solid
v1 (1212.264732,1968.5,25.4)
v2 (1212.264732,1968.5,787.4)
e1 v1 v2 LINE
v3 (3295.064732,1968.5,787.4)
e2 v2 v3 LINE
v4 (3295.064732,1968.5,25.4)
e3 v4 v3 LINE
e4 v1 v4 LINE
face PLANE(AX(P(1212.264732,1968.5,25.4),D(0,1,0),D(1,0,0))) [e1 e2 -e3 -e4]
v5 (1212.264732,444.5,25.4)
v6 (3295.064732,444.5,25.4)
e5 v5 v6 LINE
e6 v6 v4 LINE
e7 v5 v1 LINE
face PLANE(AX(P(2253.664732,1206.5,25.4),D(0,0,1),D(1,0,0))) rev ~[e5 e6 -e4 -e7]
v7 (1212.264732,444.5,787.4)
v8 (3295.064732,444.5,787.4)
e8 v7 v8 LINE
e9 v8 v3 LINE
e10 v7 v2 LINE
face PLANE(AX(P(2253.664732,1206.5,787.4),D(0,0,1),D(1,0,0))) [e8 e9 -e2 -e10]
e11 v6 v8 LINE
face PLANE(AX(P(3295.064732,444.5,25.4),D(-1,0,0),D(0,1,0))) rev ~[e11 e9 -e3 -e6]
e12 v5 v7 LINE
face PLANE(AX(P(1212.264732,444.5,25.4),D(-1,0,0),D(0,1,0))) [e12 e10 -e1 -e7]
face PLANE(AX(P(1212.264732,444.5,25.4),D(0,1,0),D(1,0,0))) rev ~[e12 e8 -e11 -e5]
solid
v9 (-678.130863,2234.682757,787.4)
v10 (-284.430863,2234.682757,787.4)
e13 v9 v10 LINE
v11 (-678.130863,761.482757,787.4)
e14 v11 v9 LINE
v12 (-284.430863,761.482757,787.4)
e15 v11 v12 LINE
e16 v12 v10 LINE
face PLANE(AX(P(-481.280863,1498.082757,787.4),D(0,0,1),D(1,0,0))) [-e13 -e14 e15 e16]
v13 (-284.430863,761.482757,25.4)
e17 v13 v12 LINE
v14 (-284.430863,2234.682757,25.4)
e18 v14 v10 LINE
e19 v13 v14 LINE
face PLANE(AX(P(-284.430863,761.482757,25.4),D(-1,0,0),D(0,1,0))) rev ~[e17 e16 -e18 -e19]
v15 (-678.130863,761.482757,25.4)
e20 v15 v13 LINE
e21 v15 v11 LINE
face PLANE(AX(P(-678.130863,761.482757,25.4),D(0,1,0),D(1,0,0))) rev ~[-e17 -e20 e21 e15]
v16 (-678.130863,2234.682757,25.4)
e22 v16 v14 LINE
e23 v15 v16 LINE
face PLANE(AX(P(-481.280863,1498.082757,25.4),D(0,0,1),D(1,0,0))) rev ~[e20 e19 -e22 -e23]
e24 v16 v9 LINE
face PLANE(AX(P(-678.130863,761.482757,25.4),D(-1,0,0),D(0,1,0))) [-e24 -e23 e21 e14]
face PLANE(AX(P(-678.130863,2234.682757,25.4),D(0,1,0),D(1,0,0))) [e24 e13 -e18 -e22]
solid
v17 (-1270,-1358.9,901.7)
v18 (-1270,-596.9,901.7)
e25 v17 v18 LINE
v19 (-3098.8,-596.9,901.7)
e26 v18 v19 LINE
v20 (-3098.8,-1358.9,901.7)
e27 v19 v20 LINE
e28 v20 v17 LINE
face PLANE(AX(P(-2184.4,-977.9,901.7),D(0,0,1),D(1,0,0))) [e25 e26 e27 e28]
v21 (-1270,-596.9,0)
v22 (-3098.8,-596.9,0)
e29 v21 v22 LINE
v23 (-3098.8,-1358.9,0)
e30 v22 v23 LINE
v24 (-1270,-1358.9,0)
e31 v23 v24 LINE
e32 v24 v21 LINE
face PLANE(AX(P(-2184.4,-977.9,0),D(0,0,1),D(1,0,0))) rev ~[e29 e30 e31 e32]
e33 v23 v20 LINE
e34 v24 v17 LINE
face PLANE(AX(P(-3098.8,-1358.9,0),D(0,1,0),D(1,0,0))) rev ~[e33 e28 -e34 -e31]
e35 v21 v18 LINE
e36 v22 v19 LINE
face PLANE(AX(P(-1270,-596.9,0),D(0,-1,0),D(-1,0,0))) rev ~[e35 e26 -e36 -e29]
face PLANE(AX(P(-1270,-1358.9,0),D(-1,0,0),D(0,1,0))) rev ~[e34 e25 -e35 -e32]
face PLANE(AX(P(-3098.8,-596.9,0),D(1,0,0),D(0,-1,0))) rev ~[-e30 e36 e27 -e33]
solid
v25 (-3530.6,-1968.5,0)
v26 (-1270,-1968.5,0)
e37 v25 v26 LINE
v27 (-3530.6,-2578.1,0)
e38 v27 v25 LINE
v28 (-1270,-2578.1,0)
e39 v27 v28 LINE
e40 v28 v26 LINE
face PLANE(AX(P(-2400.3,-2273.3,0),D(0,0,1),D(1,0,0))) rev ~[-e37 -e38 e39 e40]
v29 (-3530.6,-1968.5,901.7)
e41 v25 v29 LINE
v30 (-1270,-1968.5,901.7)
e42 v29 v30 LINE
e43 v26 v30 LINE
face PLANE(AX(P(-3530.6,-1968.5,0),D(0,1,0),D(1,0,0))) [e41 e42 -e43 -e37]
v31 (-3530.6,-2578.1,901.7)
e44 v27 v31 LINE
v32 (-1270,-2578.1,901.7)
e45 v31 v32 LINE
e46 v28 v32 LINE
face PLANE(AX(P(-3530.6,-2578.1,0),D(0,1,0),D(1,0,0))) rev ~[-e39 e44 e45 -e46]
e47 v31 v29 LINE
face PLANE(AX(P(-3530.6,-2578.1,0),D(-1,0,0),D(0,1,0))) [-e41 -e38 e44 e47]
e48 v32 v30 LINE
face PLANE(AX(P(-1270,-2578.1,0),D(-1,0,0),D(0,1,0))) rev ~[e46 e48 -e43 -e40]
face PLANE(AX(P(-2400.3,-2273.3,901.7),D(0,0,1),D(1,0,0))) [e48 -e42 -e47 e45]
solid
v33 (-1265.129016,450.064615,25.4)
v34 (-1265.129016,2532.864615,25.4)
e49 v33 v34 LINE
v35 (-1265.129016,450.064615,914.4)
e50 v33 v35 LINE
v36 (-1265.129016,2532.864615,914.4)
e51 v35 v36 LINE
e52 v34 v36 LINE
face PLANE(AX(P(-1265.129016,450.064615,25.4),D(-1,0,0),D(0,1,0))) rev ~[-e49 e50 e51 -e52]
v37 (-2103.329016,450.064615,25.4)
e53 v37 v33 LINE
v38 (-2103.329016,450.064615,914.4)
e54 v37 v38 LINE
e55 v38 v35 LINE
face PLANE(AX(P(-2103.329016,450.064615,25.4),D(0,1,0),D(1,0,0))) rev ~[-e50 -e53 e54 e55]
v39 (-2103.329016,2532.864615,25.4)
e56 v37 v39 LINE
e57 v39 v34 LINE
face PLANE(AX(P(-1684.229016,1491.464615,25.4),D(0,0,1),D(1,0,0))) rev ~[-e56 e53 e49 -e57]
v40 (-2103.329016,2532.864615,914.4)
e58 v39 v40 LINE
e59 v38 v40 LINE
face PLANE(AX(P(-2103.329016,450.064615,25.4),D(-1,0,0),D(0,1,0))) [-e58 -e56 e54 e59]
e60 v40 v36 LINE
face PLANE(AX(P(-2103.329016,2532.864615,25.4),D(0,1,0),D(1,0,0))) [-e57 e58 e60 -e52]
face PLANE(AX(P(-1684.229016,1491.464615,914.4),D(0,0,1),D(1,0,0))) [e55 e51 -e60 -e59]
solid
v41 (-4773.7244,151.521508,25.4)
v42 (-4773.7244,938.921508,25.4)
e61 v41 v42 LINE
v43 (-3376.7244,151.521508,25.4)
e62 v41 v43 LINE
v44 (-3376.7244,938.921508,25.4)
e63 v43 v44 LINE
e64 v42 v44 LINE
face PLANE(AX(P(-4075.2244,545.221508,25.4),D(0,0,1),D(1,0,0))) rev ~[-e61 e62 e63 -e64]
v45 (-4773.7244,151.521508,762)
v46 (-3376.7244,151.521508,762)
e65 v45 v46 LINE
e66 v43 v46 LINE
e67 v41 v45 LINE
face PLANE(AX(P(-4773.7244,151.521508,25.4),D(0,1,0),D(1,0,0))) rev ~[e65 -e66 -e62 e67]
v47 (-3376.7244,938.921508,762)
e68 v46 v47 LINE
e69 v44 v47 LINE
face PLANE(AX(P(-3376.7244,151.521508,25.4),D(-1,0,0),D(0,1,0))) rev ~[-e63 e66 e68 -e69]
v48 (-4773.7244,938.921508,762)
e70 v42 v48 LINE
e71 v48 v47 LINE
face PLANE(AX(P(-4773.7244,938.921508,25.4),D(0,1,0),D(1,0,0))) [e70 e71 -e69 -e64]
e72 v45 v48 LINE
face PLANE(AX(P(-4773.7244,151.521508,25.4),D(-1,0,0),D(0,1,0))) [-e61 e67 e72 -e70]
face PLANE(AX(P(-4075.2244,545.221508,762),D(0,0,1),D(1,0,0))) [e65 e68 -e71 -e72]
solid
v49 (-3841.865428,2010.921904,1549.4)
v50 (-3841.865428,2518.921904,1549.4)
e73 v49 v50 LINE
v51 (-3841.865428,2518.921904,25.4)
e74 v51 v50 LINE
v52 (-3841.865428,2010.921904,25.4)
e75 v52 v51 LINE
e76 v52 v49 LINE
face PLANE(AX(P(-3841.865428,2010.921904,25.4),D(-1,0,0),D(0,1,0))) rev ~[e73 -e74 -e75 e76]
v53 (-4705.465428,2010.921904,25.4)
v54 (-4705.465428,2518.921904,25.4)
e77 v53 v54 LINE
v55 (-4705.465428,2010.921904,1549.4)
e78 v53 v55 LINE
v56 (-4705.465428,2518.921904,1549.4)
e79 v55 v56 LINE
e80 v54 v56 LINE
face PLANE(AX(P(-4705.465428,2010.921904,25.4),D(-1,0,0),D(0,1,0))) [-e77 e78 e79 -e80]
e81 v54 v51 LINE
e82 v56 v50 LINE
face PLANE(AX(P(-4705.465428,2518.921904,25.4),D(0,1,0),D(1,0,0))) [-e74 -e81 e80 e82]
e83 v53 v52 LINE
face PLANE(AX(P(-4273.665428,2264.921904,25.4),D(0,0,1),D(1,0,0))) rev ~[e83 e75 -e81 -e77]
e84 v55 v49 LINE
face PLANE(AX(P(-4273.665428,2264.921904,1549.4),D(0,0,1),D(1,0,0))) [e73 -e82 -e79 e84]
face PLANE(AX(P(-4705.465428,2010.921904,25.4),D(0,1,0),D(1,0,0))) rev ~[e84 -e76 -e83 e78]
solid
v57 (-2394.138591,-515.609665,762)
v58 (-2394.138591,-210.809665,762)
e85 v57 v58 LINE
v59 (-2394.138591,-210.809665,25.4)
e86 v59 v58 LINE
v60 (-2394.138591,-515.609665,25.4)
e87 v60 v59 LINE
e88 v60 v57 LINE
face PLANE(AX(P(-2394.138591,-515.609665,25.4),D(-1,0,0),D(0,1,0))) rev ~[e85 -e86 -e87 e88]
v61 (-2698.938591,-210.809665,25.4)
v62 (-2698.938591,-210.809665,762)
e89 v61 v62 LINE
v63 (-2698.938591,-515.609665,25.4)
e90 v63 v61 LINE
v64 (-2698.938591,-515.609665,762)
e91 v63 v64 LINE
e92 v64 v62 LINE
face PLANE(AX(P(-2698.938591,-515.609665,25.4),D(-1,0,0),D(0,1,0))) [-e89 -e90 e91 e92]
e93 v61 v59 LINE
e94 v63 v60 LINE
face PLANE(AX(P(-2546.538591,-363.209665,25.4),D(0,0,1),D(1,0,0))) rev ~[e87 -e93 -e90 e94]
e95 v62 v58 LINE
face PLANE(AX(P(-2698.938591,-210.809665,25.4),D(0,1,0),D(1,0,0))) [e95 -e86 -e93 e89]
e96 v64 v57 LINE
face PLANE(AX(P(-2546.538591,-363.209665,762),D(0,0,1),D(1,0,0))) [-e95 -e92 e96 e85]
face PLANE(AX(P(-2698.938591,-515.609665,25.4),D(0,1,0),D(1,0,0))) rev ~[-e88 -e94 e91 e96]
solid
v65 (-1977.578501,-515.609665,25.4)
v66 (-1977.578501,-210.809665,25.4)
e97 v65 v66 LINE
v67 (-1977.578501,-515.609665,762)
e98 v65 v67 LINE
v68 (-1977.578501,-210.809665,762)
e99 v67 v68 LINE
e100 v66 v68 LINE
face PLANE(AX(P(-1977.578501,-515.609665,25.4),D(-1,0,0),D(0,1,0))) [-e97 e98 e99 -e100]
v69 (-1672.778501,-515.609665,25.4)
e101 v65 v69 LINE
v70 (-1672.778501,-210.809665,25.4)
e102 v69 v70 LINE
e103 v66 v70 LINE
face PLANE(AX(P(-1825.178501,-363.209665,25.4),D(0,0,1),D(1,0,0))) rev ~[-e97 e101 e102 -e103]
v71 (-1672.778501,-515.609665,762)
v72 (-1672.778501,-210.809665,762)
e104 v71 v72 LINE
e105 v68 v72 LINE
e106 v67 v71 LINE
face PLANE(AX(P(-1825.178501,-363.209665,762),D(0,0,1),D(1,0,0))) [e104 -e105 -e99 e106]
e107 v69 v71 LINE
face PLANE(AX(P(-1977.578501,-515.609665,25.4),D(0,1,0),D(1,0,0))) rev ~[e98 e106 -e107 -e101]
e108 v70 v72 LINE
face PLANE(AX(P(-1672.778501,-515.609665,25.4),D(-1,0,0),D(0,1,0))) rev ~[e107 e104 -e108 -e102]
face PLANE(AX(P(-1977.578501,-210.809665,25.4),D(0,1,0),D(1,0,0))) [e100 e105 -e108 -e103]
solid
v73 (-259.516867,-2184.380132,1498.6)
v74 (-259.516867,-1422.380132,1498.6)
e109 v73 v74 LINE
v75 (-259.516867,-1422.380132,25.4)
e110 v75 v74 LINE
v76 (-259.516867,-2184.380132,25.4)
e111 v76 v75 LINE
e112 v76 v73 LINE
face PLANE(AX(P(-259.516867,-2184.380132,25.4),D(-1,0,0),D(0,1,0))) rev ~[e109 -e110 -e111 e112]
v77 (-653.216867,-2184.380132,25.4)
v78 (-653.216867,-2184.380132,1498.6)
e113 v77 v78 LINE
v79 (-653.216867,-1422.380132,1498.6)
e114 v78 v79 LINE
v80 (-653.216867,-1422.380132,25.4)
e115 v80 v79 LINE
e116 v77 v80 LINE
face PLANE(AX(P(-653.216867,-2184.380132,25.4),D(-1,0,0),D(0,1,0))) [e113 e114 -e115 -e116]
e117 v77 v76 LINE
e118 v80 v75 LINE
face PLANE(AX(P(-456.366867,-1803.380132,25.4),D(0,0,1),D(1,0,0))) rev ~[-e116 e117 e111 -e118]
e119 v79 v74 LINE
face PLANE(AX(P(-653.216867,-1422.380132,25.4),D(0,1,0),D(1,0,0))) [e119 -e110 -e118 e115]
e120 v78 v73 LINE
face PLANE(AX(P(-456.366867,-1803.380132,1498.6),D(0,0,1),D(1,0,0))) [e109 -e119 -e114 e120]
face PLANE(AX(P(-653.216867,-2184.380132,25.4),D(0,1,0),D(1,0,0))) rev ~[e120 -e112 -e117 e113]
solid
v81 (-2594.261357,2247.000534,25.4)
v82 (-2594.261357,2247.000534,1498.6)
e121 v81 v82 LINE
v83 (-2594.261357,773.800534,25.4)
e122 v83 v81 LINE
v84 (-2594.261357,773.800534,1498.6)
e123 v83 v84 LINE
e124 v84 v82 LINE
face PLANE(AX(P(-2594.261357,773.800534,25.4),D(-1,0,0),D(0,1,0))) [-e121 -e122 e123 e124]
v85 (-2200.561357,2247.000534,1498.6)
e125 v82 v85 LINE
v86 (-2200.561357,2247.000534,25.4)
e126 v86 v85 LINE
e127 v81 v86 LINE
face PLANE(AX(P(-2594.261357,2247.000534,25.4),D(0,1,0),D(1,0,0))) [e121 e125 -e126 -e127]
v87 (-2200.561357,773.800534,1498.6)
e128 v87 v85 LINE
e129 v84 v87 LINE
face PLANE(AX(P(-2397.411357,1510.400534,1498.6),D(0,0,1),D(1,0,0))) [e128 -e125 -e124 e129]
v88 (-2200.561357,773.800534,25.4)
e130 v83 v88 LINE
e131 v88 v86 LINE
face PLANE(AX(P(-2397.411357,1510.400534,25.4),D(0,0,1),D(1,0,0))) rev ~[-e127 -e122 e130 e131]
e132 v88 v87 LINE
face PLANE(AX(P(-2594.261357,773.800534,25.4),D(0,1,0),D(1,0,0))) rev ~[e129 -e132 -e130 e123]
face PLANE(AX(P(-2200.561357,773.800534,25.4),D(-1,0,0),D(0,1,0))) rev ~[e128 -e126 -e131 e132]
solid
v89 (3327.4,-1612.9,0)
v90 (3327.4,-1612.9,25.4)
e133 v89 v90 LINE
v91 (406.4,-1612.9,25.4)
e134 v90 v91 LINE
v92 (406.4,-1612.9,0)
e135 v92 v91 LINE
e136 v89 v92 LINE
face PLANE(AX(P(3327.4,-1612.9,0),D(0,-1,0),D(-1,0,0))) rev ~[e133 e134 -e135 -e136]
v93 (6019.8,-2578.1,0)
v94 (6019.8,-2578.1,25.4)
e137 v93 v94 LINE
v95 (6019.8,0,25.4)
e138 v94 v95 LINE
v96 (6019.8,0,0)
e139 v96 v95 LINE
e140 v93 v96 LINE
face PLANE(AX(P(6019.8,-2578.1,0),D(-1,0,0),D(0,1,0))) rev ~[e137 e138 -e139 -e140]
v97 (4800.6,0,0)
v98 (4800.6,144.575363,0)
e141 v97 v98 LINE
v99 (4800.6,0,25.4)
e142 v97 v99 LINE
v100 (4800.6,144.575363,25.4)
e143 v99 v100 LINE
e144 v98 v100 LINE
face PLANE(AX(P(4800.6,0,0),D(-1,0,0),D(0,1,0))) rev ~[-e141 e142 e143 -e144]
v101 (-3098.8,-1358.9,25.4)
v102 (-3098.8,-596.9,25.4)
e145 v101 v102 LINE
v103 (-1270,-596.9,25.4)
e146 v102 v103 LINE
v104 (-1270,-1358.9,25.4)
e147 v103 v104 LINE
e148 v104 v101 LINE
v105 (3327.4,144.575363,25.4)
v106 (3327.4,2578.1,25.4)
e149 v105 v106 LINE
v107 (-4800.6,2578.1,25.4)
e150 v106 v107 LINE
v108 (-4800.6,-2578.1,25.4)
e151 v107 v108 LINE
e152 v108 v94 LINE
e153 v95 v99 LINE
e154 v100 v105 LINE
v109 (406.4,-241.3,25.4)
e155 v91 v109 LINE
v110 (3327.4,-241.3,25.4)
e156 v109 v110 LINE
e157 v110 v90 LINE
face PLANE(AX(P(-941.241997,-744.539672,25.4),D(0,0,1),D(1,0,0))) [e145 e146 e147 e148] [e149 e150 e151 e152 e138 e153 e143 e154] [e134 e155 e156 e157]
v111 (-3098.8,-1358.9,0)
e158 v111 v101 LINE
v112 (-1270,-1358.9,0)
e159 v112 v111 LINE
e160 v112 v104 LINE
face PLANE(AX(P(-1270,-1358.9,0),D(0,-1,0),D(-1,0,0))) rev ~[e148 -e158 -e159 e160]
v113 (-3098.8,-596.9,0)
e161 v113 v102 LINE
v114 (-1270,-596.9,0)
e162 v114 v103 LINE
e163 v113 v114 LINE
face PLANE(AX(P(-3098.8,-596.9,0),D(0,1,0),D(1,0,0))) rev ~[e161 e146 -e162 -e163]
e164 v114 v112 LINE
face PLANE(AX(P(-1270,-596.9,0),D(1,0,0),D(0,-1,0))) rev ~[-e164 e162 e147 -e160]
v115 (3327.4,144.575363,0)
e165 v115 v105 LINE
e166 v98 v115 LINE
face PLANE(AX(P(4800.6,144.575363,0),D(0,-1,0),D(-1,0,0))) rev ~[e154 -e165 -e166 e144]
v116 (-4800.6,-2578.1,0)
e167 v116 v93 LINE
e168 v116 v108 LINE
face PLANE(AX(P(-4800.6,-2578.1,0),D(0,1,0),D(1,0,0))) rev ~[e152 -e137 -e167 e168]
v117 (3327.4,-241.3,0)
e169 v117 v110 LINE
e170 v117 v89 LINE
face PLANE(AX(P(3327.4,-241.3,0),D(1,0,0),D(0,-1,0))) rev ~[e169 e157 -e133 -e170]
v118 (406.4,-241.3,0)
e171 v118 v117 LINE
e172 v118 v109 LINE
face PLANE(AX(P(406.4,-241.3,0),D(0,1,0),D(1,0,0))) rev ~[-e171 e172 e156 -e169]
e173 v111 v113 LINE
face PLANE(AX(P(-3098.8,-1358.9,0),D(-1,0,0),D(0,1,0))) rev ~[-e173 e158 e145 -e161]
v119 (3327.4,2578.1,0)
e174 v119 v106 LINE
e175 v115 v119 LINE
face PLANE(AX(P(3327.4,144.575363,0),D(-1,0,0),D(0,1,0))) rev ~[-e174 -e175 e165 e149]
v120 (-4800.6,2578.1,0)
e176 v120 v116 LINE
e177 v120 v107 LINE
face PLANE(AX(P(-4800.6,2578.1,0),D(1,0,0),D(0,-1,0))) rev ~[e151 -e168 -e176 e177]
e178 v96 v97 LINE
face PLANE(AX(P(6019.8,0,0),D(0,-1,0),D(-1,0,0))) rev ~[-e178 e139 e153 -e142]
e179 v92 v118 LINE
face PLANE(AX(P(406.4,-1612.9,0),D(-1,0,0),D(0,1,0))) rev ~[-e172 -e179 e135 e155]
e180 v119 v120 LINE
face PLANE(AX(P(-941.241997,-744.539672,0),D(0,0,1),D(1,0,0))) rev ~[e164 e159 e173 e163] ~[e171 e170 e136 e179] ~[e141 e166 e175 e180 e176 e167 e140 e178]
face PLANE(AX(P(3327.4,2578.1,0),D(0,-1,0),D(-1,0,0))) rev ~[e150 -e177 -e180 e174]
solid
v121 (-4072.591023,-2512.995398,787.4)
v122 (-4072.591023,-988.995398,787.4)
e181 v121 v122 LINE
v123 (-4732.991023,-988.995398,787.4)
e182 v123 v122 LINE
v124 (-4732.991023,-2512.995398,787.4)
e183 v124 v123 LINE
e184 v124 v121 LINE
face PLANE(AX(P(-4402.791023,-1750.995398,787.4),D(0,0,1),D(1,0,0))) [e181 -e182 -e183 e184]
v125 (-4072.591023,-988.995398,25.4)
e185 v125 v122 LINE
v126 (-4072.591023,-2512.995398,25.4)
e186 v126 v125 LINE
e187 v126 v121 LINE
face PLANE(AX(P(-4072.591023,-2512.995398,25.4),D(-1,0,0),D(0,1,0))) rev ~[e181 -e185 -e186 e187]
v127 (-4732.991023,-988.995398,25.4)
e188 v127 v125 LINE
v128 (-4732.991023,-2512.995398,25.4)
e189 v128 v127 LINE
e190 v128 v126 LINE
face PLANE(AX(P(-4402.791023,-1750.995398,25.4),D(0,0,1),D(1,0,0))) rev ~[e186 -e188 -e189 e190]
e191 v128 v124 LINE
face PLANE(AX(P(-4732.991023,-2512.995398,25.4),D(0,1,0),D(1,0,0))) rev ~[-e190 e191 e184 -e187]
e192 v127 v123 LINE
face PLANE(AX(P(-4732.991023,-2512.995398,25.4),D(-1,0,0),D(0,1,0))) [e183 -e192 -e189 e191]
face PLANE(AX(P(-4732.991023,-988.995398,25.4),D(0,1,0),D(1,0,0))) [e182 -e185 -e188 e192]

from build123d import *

# Parameters (mm, degrees)
F2_DEPTH  = 901.7
F0_W      = 2260.6
F0_H      = 609.6
F0_W_2    = 609.6
F0_H_2    = 2438.4
F4_DEPTH  = 25.4
F7_W      = 838.2
F7_H      = 2082.8
F8_DEPTH  = 889
F9_W      = 393.7
F9_H      = 1473.2
F10_DEPTH = 762
F11_W     = 863.6
F11_H     = 508
F12_DEPTH = 1524
F13_W     = 1397
F13_H     = 787.4
F14_DEPTH = 736.6
F15_W     = 393.7
F15_H     = 762
F16_DEPTH = 1473.2
F17_W     = 393.7
F17_H     = 1473.2
F18_DEPTH = 1473.2
F19_W     = 304.8
F19_H     = 304.8
F20_DEPTH = 736.6
F21_W     = 660.4
F21_H     = 1524
F22_DEPTH = 762
F23_W     = 2082.8
F23_H     = 1524
F24_DEPTH = 762


# Not quite as in the source:
# - the program builds the solid bodies; features that only make, move or delete a surface that nothing else refers to are left out


with BuildPart() as f2:
    # F0 (on Top) → F2 (new body)
    with BuildSketch(Plane.XY):
        Polygon((-1270, -1358.9), (-1270, -952.5), (-1270, -596.9), (-3098.8, -596.9), (-3098.8, -1358.9), align=None)
    extrude(amount=F2_DEPTH)


with BuildPart() as f2b:
    # F0 (on Top) → F2, piece 2 (new body)
    with BuildSketch(Plane.XY):
        with Locations((-2400.3, -2273.3)):
            Rectangle(F0_W, F0_H)
    extrude(amount=F2_DEPTH)


with BuildPart() as f4:
    # F0 (on Top) → F4 (new body)
    with BuildSketch(Plane.XY):
        Polygon((-812.8, -2578.1), (4800.6, -2578.1), (4800.6, -1612.9), (3327.4, -1612.9), (406.4, -1612.9), (406.4, -241.3), (406.4, 139.7), (-203.2, 139.7), (-203.2, 2578.1), (-4800.6, 2578.1), (-4800.6, -2578.1), (-3530.6, -2578.1), (-3530.6, -1968.5), (-1270, -1968.5), (-1270, -1358.9), (-3098.8, -1358.9), (-3098.8, -596.9), (-1270, -596.9), (-1270, -952.5), (-812.8, -952.5), align=None)
        Polygon((4800.6, -1612.9), (4800.6, -2578.1), (6019.8, -2578.1), (6019.8, 0), (4800.6, 0), align=None)
        Polygon((-1270, -2578.1), (-812.8, -2578.1), (-812.8, -952.5), (-1270, -952.5), (-1270, -1358.9), (-1270, -1968.5), align=None)
        Polygon((3327.4, -1612.9), (4800.6, -1612.9), (4800.6, 0), (4800.6, 144.5753626943), (3327.4, 144.5753626943), (3327.4, -241.3), align=None)
        with Locations((-2400.3, -2273.3)):
            Rectangle(F0_W, F0_H)
        Polygon((406.4, -241.3), (3327.4, -241.3), (3327.4, 144.5753626943), (3327.4, 2578.1), (406.4, 2578.1), (406.4, 139.7), align=None)
        with Locations((101.6, 1358.9)):
            Rectangle(F0_W_2, F0_H_2)
    extrude(amount=F4_DEPTH)


with BuildPart() as f8:
    # F7 (on face) → F8 (new body)
    with BuildSketch(Plane.XY.offset(25.4)):
        with Locations((-1684.229016304, 1491.4646148682)):
            Rectangle(F7_W, F7_H)
    extrude(amount=F8_DEPTH)


with BuildPart() as f10:
    # F9 (on face) → F10 (new body)
    with BuildSketch(Plane.XY.offset(25.4)):
        with Locations((-481.2808632851, 1498.0827569962)):
            Rectangle(F9_W, F9_H)
    extrude(amount=F10_DEPTH)


with BuildPart() as f12:
    # F11 (on face) → F12 (new body)
    with BuildSketch(Plane.XY.offset(25.4)):
        with Locations((-4273.6654281616, 2264.9219036102)):
            Rectangle(F11_W, F11_H)
    extrude(amount=F12_DEPTH)


with BuildPart() as f14:
    # F13 (on face) → F14 (new body)
    with BuildSketch(Plane.XY.offset(25.4)):
        with Locations((-4075.2243995667, 545.2215075493)):
            Rectangle(F13_W, F13_H)
    extrude(amount=F14_DEPTH)


with BuildPart() as f16:
    # F15 (on face) → F16 (new body)
    with BuildSketch(Plane.XY.offset(25.4)):
        with Locations((-456.366866827, -1803.3801317215)):
            Rectangle(F15_W, F15_H)
    extrude(amount=F16_DEPTH)


with BuildPart() as f18:
    # F17 (on face) → F18 (new body)
    with BuildSketch(Plane.XY.offset(25.4)):
        with Locations((-2397.4113569062, 1510.4005336761)):
            Rectangle(F17_W, F17_H)
    extrude(amount=F18_DEPTH)


with BuildPart() as f20:
    # F19 (on face) → F20 (new body)
    with BuildSketch(Plane.XY.offset(25.4)):
        with Locations((-1825.1785008743, -363.2096648216)):
            Rectangle(F19_W, F19_H)
    extrude(amount=F20_DEPTH)


with BuildPart() as f20b:
    # F19 (on face) → F20, piece 2 (new body)
    with BuildSketch(Plane.XY.offset(25.4)):
        with Locations((-2546.5385913849, -363.2096648216)):
            Rectangle(F19_W, F19_H)
    extrude(amount=F20_DEPTH)


with BuildPart() as f22:
    # F21 (on face) → F22 (new body)
    with BuildSketch(Plane.XY.offset(25.4)):
        with Locations((-4402.7910232544, -1750.9953975677)):
            Rectangle(F21_W, F21_H)
    extrude(amount=F22_DEPTH)


with BuildPart() as f24:
    # F23 (on face) → F24 (new body)
    with BuildSketch(Plane.XY.offset(25.4)):
        with Locations((2253.6647319794, 1206.5)):
            Rectangle(F23_W, F23_H)
    extrude(amount=F24_DEPTH)


solid = Compound([f2.part, f2b.part, f4.part, f8.part, f10.part, f12.part, f14.part, f16.part, f18.part, f20.part, f20b.part, f22.part, f24.part])
